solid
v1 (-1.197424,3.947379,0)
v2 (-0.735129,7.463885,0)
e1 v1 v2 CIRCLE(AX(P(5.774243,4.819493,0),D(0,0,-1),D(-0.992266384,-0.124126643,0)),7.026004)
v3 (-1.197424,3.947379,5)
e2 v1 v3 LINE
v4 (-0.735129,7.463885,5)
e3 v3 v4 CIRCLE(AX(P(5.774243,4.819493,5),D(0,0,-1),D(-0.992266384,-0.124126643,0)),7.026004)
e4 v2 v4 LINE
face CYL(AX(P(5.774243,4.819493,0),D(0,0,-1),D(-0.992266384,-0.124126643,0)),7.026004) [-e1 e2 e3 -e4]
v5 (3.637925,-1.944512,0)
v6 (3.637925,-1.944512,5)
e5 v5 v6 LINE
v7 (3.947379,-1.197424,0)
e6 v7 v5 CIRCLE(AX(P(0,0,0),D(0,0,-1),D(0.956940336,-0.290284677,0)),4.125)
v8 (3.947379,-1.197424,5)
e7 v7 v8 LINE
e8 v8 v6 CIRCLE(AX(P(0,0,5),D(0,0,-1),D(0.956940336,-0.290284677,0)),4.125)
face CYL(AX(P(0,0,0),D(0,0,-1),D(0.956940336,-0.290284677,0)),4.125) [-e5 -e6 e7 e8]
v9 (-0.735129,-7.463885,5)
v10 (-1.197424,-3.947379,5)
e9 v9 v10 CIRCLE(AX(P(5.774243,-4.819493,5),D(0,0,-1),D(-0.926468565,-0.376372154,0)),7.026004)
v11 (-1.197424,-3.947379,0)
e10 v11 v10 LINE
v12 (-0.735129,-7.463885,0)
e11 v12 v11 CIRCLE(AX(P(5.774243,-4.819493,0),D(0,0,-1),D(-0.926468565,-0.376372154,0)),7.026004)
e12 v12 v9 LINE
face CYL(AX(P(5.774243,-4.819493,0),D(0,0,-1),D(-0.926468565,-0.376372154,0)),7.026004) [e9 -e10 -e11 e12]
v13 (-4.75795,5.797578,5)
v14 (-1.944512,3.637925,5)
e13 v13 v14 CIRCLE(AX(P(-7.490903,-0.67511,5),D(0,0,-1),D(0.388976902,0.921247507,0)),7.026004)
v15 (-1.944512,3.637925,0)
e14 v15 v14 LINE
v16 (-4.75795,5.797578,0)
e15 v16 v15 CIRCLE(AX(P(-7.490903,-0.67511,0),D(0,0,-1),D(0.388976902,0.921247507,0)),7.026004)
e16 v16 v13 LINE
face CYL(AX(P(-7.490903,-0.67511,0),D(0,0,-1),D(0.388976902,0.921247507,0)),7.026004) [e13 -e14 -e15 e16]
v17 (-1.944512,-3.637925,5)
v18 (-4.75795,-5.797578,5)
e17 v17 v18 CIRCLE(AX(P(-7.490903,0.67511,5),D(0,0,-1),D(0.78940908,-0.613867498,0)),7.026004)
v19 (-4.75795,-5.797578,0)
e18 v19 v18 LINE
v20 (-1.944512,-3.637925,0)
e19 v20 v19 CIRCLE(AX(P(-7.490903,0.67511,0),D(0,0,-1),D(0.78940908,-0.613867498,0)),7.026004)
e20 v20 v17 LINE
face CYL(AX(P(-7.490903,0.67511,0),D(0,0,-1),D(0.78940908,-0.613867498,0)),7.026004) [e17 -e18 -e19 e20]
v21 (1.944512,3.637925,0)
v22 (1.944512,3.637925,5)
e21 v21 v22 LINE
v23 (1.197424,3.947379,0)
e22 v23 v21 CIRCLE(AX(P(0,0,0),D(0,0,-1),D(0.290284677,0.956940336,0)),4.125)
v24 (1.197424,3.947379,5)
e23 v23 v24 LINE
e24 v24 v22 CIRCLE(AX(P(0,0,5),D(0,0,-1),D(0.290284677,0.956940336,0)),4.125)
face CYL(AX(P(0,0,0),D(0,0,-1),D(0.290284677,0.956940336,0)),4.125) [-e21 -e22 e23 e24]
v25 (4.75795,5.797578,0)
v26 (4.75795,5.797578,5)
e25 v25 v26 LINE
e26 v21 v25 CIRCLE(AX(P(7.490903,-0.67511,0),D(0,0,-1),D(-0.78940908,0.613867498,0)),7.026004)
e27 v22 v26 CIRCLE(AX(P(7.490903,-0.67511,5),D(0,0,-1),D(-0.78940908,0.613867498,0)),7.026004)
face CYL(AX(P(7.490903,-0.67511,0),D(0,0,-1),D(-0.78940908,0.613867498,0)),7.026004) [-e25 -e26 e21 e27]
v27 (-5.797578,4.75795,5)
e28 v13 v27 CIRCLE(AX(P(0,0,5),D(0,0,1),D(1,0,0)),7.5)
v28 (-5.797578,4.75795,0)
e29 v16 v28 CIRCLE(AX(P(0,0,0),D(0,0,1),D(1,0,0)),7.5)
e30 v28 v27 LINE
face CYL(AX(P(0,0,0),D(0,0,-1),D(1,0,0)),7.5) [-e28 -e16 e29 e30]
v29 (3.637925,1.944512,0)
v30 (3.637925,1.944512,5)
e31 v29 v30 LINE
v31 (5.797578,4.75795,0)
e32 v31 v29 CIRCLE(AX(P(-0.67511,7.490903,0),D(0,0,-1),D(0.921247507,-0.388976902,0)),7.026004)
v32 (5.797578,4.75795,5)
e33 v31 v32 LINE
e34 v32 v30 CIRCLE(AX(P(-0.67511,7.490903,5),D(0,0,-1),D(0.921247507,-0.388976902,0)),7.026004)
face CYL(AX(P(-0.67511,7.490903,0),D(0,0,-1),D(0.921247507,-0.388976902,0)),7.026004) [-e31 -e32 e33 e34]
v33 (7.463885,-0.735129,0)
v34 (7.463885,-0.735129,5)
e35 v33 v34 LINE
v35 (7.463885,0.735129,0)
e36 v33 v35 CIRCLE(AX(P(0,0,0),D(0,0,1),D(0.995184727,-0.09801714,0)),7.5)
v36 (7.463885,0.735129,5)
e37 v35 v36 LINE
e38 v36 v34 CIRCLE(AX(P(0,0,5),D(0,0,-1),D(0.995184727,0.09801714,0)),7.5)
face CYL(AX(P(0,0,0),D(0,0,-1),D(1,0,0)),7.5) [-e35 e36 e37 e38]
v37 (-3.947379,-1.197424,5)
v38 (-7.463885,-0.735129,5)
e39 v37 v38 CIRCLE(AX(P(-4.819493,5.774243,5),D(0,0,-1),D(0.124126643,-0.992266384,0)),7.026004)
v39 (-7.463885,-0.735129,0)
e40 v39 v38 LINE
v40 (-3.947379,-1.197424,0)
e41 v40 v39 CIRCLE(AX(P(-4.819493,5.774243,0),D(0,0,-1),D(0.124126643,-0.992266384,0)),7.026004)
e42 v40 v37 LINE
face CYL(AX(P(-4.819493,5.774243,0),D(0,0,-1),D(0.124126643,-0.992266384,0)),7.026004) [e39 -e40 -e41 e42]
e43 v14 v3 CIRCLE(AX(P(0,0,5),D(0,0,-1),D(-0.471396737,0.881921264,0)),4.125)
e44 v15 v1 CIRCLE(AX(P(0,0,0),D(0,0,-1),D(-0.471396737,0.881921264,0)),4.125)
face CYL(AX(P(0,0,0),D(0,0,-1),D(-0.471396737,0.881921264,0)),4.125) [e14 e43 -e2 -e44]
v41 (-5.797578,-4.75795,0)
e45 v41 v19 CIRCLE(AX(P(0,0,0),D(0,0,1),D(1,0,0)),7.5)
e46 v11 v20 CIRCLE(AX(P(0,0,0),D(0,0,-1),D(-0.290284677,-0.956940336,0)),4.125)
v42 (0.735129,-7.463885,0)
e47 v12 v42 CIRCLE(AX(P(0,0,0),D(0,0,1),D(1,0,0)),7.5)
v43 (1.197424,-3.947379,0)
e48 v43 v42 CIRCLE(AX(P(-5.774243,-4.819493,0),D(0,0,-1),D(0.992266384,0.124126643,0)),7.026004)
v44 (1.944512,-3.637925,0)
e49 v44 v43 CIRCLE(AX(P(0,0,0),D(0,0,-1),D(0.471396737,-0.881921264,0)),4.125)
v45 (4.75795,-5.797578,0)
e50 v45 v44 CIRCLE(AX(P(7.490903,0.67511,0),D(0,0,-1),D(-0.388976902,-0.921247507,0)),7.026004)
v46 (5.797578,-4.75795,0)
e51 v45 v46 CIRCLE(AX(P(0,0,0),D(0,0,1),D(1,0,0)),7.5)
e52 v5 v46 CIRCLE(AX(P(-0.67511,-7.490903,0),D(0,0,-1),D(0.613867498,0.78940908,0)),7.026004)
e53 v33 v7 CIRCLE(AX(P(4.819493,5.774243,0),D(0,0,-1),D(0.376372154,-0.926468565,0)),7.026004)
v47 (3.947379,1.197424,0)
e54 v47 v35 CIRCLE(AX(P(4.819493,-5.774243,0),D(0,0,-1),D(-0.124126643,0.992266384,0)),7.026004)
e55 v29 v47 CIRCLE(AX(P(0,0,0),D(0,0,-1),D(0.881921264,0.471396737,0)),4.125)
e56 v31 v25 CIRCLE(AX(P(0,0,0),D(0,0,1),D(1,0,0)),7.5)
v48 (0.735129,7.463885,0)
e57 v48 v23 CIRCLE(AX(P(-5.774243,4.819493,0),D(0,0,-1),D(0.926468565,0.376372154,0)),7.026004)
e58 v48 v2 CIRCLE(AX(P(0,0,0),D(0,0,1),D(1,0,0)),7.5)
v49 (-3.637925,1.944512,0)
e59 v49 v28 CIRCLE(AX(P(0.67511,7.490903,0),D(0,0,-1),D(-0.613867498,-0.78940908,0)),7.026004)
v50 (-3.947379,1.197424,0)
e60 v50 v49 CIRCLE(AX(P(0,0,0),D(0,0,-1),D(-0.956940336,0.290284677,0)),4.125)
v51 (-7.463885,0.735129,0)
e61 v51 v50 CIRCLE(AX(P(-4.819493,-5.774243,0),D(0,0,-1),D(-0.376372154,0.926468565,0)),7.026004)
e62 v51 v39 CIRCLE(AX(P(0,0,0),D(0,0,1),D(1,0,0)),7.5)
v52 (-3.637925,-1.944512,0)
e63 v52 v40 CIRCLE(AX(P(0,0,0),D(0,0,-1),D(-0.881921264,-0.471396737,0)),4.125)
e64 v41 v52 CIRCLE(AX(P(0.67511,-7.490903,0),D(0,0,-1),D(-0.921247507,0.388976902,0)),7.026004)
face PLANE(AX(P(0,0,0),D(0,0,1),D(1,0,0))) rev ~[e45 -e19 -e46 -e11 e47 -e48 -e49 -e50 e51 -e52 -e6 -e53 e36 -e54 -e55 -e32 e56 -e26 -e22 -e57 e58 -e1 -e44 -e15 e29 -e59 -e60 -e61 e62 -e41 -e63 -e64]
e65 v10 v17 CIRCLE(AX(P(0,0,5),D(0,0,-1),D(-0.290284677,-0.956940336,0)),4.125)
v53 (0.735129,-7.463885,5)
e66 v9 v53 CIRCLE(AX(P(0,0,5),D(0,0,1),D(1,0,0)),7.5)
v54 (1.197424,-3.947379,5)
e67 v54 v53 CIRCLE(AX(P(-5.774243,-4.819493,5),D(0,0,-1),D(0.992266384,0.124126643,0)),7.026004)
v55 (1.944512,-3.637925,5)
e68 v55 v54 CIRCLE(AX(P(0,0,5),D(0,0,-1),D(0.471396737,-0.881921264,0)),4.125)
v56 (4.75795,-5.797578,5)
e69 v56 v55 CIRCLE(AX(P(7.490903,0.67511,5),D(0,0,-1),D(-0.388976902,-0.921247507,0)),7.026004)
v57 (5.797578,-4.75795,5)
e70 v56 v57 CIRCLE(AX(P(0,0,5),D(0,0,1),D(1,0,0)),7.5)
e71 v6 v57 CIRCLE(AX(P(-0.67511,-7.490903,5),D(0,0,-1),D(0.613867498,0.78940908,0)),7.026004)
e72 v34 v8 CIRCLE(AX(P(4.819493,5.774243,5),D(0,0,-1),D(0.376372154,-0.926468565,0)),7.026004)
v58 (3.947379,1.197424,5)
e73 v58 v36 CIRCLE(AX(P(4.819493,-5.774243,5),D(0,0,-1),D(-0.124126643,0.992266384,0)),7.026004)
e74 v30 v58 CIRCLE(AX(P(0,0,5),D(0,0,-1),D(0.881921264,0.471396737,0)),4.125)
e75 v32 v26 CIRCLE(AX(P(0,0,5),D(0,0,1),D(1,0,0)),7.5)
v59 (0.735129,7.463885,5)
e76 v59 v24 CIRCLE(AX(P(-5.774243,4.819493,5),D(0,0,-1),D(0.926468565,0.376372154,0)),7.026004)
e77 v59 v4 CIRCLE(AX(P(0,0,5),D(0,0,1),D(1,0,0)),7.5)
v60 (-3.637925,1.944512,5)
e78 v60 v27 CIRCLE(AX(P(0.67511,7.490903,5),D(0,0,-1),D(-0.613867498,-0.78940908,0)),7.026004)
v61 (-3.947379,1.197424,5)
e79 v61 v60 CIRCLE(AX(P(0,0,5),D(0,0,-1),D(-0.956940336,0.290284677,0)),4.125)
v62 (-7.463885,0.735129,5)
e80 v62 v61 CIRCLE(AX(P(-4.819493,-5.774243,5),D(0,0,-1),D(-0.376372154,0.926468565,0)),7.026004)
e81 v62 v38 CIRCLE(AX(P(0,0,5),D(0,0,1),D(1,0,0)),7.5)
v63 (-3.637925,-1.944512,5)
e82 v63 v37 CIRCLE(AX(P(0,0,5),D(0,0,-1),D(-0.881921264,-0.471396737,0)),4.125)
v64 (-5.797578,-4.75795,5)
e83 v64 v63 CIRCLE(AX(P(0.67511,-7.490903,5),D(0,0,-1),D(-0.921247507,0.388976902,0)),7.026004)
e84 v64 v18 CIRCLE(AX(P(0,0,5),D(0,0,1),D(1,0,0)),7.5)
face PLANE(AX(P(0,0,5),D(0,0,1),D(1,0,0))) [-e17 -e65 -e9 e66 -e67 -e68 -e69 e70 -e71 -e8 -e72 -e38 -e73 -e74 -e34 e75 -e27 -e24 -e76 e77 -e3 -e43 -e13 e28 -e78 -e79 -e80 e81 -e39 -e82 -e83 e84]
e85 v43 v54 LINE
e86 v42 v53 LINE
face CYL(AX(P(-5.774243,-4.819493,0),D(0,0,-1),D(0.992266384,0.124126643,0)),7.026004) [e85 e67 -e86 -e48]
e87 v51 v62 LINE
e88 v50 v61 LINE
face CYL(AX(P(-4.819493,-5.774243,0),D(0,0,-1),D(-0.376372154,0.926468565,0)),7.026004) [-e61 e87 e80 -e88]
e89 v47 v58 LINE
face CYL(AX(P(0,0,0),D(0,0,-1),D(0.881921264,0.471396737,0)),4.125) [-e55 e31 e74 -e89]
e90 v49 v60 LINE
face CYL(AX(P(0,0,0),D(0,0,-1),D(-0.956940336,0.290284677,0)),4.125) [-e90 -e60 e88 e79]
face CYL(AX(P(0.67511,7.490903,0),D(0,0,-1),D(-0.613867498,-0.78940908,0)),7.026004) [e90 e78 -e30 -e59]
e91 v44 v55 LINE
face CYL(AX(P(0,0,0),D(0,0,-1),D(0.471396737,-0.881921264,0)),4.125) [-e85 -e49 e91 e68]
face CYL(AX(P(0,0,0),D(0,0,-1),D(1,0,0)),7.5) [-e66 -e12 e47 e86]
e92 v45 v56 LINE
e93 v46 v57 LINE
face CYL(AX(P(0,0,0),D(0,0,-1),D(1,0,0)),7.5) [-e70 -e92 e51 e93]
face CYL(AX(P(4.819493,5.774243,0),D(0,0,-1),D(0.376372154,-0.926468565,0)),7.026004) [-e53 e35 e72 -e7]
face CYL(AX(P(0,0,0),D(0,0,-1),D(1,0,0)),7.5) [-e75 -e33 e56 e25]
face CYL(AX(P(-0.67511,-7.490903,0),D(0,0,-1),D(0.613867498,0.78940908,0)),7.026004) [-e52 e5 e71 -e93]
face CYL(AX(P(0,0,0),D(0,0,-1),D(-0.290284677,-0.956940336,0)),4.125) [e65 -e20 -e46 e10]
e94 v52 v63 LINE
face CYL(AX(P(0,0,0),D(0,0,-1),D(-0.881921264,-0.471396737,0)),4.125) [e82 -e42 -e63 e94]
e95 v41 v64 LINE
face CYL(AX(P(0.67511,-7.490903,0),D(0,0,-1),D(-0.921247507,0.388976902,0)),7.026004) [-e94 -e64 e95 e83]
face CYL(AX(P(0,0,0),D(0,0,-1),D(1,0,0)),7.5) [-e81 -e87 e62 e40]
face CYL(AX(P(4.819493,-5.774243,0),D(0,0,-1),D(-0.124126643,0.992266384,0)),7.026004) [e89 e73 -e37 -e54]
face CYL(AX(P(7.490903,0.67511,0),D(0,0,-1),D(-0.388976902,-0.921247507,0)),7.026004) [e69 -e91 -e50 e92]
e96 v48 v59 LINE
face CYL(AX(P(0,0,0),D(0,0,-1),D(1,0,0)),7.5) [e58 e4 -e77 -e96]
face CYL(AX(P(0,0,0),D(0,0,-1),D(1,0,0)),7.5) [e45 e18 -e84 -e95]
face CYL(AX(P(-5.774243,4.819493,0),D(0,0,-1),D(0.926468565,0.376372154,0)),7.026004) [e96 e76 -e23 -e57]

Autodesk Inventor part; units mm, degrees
sketch "Sketch1" plane through (0, 0, 0) normal (0, 0, 1) x (1, 0, 0)
  circle A0 centre (0, 0) radius 7.5
  dimension "d0" = 15
extrude "Extrusion1" add sketch "Sketch1" along normal blind 5
ref_plane "Work Plane2" through (0, 0, 2.5) normal (0, 0, 1) x (1, 0, 0)
sketch "Sketch2" plane through (0, 0, 0) normal (0, 0, -1) x (-1, 0, 0)
  circle A0 centre (0, 0) radius 7.5 projected
  circle A1 centre (0, 0) radius 6
  dimension "d3" = 12
surface extrude "Diámetro de separación" sketch "Sketch2" against normal through all shown no curves A1
ref_plane "Work Plane8" through (0, 0, 0) normal (0.9238795, 0.3826834, 0) x (0, 0, 1)
ref_plane "Work Plane9" through (0, 0, 0) normal (1, 0, 0) x (0, 1, 0)
spur gear teeth "Engranaje recto" teeth 8 pitch diameter 12 tip diameter 15 root diameter 8.25 face width 5 start plane through (0, 0, 0) normal (0, 0, -1) x (-1, 0, 0)
equation "\"d0\" = da_da"
equation "\"d1\" = da_b"
equation "\"d3\" = da_d"
equation "\"d16\" = da_aw"
equation "\"d43\" = da_aw"
equation "\"d46\" = da_aw"
equation "\"da_da\" = 15"
equation "\"da_b\" = 5"
equation "\"da_d\" = 12"
equation "\"da_aw\" = 36"
properties part number "Engranaje recto1" material "Steel"
